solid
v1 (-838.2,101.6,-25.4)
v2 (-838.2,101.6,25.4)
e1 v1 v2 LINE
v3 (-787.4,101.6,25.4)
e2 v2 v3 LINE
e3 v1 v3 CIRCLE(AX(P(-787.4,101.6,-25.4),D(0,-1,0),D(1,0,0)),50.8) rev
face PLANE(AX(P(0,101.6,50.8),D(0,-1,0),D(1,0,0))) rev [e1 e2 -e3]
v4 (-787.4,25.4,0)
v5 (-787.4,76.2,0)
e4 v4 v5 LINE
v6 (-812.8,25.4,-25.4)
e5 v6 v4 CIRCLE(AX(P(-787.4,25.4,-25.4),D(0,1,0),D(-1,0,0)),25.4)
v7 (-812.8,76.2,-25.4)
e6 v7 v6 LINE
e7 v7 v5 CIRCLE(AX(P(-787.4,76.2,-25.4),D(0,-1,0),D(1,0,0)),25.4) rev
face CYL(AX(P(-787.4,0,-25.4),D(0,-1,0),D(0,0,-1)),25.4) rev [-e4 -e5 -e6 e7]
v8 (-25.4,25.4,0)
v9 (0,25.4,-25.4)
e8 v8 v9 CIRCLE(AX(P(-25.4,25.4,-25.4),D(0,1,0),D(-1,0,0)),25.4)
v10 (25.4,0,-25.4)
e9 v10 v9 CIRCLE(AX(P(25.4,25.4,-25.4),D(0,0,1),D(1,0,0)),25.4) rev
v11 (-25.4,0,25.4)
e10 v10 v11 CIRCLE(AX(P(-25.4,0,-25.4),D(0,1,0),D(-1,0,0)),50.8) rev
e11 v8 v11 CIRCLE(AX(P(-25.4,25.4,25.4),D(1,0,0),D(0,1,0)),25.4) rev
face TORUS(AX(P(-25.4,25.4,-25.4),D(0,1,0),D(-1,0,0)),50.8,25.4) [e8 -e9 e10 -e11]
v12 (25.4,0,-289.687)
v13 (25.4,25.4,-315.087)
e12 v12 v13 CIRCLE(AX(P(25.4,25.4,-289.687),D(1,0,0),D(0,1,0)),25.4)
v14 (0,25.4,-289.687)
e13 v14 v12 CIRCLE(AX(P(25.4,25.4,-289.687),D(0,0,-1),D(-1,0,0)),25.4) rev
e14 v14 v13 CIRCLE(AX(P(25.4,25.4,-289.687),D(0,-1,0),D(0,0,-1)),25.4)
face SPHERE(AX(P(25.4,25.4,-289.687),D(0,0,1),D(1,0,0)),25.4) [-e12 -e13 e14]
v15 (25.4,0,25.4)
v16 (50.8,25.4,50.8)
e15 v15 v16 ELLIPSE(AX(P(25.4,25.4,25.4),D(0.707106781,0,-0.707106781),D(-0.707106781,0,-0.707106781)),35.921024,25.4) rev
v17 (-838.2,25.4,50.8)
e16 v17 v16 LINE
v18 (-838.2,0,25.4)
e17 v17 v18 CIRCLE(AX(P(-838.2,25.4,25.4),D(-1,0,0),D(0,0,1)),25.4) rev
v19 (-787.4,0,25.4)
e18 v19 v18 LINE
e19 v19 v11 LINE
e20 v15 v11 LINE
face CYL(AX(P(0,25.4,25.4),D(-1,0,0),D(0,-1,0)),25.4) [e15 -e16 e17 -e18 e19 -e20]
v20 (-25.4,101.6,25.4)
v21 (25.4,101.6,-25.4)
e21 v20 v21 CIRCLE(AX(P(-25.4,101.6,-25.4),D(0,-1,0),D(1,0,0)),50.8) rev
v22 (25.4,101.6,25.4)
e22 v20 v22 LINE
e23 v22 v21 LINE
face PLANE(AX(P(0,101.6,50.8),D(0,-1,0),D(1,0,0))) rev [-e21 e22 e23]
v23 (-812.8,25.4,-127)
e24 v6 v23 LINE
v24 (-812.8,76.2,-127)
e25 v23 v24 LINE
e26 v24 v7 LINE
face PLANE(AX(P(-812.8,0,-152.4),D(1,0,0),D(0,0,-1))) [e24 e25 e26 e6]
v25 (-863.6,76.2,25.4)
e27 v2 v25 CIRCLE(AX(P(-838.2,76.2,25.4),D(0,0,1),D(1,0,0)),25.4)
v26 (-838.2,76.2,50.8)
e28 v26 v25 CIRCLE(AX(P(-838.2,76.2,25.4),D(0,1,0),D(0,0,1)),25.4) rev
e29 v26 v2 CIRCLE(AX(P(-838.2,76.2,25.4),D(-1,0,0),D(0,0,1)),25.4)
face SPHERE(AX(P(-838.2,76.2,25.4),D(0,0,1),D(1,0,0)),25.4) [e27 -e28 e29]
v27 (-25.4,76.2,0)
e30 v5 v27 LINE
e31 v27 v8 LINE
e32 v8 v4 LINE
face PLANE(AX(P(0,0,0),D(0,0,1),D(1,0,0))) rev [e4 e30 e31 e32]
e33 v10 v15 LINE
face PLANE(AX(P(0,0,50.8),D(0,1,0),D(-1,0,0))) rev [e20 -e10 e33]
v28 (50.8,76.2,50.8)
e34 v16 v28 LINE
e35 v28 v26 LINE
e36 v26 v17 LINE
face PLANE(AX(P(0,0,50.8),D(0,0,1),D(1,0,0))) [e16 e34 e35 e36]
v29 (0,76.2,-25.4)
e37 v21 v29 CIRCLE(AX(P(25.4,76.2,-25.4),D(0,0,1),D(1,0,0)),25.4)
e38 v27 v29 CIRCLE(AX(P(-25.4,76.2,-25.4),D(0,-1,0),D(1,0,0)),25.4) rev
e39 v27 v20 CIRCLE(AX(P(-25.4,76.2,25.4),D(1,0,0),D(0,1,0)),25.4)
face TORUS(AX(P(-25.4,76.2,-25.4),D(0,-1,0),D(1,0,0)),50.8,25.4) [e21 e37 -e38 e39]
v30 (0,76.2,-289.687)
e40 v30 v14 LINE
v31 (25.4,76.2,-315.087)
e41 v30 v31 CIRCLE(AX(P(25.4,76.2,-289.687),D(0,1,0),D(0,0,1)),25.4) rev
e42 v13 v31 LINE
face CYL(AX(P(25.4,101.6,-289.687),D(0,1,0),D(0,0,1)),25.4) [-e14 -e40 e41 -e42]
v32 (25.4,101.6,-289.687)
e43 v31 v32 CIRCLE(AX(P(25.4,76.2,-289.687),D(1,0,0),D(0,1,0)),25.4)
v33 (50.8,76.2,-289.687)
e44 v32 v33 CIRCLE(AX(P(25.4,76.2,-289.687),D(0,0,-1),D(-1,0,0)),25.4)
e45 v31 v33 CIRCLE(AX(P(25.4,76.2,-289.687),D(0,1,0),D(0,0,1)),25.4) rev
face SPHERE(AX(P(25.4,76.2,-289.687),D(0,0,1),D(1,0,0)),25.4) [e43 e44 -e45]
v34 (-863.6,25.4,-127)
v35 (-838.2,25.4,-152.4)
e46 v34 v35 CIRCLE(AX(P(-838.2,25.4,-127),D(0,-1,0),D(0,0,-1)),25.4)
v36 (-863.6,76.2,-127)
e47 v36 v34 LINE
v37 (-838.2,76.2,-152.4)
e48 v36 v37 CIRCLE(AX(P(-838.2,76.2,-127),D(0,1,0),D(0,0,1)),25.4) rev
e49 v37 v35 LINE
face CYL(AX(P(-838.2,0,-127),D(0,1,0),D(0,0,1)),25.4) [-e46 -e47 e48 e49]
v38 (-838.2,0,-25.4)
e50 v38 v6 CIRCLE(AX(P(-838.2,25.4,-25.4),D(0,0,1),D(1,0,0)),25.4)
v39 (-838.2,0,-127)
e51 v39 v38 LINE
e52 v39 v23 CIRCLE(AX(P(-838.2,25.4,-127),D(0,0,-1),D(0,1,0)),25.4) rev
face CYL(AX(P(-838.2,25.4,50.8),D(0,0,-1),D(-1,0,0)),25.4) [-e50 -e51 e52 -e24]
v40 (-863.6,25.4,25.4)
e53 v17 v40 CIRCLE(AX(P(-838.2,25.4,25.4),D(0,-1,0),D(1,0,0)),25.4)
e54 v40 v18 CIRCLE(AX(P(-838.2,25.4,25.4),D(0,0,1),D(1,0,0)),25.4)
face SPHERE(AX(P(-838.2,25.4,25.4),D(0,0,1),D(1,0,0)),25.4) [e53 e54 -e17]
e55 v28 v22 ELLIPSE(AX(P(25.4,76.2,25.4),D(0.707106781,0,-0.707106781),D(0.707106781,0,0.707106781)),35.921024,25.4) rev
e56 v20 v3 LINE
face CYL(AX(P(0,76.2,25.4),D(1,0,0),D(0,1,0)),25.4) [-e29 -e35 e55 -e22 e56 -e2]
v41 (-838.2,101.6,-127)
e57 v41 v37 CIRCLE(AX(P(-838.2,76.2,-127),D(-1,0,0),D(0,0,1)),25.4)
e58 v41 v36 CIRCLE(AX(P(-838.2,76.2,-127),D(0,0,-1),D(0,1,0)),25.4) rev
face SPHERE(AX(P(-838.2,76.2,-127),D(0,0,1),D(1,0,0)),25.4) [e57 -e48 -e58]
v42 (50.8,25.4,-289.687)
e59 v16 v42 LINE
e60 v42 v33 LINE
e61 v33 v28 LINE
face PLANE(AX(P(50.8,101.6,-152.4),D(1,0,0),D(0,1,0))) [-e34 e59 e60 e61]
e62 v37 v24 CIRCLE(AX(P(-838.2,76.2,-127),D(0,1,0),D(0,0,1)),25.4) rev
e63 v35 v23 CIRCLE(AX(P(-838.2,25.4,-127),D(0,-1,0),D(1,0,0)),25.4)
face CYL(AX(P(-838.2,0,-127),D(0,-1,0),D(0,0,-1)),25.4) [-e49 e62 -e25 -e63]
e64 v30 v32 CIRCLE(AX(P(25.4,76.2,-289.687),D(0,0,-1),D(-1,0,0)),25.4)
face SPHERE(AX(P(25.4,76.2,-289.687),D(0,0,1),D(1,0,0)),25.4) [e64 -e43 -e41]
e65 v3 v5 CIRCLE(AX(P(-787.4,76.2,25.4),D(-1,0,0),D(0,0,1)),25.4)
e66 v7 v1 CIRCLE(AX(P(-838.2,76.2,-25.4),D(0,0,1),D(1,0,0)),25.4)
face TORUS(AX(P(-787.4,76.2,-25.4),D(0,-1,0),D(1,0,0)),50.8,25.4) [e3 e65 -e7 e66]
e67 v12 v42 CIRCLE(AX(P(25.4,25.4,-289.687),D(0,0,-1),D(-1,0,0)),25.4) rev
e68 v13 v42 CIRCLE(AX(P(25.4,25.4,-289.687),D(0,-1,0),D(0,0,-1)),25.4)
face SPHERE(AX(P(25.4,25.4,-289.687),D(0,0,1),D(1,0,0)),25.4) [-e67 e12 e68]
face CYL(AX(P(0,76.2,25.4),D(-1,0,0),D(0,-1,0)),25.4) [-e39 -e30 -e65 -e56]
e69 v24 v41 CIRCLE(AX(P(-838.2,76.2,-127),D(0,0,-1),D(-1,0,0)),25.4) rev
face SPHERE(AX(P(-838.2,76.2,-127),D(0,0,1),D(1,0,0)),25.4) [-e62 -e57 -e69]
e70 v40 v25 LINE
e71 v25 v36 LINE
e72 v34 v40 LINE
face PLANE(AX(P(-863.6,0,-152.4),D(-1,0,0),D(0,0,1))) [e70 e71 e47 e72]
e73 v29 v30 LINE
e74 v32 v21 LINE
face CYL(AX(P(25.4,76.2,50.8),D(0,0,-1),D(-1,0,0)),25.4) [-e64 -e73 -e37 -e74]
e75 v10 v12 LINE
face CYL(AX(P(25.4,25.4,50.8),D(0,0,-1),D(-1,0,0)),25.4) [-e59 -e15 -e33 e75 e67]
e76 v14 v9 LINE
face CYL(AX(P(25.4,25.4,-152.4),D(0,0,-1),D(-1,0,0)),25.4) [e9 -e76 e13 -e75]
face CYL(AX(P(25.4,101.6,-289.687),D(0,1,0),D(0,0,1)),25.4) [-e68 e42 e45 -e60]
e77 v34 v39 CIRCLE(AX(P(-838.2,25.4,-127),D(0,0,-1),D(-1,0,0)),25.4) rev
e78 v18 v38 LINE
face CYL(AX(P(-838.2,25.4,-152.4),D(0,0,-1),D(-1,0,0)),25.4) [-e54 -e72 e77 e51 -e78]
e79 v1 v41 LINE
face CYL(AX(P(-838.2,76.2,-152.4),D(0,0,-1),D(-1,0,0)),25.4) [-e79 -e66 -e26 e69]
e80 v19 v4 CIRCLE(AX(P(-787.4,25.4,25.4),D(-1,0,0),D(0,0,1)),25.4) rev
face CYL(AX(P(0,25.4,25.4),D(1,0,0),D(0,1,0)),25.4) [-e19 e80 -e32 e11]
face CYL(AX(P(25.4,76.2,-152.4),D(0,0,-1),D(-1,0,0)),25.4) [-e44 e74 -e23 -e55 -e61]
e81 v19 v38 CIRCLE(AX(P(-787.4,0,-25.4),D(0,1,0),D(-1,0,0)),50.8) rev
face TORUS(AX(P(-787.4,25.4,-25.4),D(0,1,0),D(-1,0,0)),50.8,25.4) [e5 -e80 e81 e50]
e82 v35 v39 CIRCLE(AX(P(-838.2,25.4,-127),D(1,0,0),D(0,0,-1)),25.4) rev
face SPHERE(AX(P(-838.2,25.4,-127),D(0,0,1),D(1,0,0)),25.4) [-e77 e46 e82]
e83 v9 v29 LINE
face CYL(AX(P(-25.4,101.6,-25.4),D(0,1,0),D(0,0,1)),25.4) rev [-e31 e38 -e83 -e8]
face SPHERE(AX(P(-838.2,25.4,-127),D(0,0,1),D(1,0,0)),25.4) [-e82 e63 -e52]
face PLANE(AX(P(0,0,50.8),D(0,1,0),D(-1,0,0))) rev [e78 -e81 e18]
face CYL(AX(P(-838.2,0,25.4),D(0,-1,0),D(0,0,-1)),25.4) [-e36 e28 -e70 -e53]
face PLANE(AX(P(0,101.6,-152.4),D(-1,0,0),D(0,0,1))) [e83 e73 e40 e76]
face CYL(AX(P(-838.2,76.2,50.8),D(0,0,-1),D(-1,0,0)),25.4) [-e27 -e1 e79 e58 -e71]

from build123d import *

# Parameters (mm, degrees)
SKETCH1_W           = 812.8
SKETCH1_H           = 101.6
BOSS_EXTRUDE1_DEPTH = 50.8
SKETCH2_W           = 50.8
SKETCH2_H           = 101.6
BOSS_EXTRUDE2_DEPTH = 203.2
SKETCH6_W           = 365.887
SKETCH6_H           = 101.6
BOSS_EXTRUDE4_DEPTH = 50.8
FILLET2_R           = 25.4


with BuildPart() as part:
    # Sketch1 → Boss-Extrude1 (new body)
    with BuildSketch(Plane.XY):
        with Locations((-406.4, 50.8)):
            Rectangle(SKETCH1_W, SKETCH1_H)
    extrude(amount=BOSS_EXTRUDE1_DEPTH)

    # Sketch2 → Boss-Extrude2 (add)
    with BuildSketch(Plane.XY.offset(50.8)):
        with Locations((-838.2, 50.8)):
            Rectangle(SKETCH2_W, SKETCH2_H)
        with Locations((25.4, 50.8)):
            Rectangle(SKETCH2_W, SKETCH2_H)
    extrude(amount=-BOSS_EXTRUDE2_DEPTH)

    # Sketch6 → Boss-Extrude4 (add)
    with BuildSketch(Plane(origin=(50.8, 0, 0), x_dir=(0, 0, -1), z_dir=(1, 0, 0))):
        with Locations((132.1435, 50.8)):
            Rectangle(SKETCH6_W, SKETCH6_H)
    extrude(amount=-BOSS_EXTRUDE4_DEPTH)

    # Fillet2
    fillet2_edges = [part.edges().sort_by_distance(p)[0] for p in [
        (-406.4, 0, 50.8),
        (-812.8, 101.6, -76.2),
        (-812.8, 50.8, -152.4),
        (-838.2, 0, -152.4),
        (-812.8, 0, -76.2),
        (-863.6, 50.8, -152.4),
        (-863.6, 0, -50.8),
        (-838.2, 101.6, -152.4),
        (-863.6, 101.6, -50.8),
        (-863.6, 50.8, 50.8),
        (0, 0, -157.5435),
        (0, 101.6, -157.5435),
        (50.8, 101.6, -132.1435),
        (50.8, 0, -132.1435),
        (50.8, 50.8, -315.087),
        (25.4, 0, -315.087),
        (0, 50.8, -315.087),
        (25.4, 101.6, -315.087),
        (-406.4, 0, 0),
        (-812.8, 50.8, 0),
        (-406.4, 101.6, 0),
        (0, 50.8, 0),
        (-406.4, 101.6, 50.8),
    ]]
    fillet(fillet2_edges, radius=FILLET2_R - 0.0001)  # a hair under: the kernel refuses the full size


solid = part.part
